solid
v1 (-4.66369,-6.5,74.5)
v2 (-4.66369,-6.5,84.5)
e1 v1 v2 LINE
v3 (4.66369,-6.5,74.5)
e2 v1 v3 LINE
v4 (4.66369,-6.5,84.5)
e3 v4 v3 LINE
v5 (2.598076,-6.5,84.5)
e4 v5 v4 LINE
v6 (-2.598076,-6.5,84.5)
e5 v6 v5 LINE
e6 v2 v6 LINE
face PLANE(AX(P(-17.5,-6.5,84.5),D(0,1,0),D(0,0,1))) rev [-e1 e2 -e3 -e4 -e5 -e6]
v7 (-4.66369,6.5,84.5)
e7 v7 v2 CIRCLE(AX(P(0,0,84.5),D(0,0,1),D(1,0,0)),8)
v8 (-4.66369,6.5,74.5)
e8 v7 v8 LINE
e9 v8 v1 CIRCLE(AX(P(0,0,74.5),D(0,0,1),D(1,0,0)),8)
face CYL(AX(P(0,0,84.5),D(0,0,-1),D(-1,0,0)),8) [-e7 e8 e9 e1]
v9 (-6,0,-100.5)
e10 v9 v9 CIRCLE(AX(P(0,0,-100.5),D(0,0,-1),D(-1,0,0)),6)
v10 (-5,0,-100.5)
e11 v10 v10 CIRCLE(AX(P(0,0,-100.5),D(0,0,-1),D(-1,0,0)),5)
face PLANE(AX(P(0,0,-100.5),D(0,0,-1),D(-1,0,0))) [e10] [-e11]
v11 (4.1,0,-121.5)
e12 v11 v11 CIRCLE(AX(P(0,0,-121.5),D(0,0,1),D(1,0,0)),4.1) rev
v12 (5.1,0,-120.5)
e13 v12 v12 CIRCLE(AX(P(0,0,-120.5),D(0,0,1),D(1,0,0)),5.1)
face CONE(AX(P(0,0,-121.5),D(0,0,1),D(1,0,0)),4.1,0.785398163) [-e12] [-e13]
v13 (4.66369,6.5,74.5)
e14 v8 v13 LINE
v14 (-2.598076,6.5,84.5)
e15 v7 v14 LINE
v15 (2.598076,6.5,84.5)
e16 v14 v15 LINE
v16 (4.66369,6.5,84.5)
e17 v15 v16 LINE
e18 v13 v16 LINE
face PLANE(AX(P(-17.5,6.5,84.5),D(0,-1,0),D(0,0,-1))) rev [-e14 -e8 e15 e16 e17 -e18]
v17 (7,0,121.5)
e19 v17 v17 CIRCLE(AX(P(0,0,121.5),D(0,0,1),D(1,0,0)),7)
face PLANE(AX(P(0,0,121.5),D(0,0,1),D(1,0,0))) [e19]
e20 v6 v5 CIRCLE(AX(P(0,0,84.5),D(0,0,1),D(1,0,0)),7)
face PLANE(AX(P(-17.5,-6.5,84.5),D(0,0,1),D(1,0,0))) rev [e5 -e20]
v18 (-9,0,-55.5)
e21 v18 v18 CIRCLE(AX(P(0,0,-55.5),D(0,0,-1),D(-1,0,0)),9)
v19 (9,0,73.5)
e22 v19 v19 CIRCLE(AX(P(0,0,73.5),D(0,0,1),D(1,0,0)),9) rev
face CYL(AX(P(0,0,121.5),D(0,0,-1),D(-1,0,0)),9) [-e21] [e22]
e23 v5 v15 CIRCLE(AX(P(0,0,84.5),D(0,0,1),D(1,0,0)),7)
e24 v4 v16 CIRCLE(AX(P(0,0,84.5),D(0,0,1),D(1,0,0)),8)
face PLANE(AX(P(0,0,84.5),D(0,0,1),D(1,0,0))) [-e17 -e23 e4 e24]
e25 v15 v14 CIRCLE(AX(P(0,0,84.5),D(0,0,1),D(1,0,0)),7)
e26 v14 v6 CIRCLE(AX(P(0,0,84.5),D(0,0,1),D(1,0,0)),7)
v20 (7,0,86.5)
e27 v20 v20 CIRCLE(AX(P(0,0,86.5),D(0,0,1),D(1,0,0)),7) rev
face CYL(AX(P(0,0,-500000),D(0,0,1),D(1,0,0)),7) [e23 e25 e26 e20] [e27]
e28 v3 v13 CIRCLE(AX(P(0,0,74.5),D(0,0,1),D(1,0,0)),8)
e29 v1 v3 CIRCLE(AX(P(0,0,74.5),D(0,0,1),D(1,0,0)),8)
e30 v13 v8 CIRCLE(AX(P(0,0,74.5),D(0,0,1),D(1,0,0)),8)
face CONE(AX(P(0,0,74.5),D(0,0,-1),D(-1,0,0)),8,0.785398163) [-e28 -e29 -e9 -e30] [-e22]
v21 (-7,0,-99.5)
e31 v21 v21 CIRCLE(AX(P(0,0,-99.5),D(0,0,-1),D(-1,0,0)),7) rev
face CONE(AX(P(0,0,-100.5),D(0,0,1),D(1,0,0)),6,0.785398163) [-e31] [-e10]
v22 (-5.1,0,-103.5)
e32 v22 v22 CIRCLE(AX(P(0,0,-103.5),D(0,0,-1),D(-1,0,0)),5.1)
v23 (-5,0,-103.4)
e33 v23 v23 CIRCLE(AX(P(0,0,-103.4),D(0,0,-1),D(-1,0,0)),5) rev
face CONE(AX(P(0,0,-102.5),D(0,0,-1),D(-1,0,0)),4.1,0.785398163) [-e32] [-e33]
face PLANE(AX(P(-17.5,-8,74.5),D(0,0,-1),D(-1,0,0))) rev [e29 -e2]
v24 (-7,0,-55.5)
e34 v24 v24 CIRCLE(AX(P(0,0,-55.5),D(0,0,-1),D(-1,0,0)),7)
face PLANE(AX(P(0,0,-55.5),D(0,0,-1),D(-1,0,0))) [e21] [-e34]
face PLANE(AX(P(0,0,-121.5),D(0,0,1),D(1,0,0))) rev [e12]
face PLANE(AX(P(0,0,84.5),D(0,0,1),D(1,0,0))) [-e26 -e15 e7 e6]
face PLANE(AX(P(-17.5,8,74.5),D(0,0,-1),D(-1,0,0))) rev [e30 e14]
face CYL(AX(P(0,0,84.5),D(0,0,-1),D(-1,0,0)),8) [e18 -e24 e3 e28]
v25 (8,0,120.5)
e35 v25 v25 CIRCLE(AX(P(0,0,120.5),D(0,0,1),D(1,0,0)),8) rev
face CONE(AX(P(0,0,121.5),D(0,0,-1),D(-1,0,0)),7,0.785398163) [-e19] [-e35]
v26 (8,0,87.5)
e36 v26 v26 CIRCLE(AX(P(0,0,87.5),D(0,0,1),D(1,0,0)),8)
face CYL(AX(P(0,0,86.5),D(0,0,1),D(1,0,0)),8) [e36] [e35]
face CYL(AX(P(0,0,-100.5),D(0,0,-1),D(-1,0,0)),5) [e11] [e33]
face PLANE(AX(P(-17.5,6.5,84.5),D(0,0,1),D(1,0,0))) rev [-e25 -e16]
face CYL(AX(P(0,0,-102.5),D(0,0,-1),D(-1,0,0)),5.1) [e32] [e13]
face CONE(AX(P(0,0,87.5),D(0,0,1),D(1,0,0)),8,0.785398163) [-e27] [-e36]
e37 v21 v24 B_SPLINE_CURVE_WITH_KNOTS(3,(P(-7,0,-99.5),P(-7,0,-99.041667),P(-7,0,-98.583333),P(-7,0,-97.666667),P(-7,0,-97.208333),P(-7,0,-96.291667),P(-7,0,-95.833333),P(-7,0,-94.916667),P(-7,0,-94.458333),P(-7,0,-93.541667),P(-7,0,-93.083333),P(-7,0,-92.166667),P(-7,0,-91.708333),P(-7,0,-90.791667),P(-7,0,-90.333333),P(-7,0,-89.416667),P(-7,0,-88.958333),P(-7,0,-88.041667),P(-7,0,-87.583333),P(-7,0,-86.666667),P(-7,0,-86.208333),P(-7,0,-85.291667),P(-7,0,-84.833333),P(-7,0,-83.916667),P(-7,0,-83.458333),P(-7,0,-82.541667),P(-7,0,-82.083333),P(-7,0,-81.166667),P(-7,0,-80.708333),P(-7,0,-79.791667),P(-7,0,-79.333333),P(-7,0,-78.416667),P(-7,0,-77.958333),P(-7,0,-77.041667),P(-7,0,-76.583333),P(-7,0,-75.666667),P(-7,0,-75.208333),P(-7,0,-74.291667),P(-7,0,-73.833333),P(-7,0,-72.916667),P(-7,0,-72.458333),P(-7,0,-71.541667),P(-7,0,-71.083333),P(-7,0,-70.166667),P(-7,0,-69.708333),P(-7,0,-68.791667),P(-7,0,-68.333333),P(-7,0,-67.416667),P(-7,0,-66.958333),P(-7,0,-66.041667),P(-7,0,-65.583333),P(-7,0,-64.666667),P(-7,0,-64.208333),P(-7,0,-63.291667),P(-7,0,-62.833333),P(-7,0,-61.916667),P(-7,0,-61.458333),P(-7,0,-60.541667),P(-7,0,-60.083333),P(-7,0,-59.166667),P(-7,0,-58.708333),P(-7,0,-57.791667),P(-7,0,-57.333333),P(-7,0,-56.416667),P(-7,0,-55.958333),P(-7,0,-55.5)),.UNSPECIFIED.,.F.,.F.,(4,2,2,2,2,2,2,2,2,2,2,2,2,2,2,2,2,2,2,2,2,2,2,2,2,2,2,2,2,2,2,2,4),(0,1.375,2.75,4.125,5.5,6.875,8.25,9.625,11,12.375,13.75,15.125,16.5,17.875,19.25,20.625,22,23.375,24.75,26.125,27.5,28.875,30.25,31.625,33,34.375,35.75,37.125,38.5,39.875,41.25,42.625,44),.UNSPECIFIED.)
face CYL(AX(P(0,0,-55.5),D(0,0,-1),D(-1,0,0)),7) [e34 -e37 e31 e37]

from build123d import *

# Parameters (mm, degrees)
SKETCH1_R           = 9
BOSS_EXTRUDE1_DEPTH = 121.5
SKETCH2_OUTSIDE_W   = 68.866
SKETCH2_OUTSIDE_H   = 68.866
SKETCH2_OUTSIDE_R   = 5.1
CUT_EXTRUDE2_DEPTH  = 19
SKETCH3_OUTSIDE_W   = 68.866
SKETCH3_OUTSIDE_H   = 68.866
SKETCH3_OUTSIDE_R   = 5
CUT_EXTRUDE3_DEPTH  = 2
SKETCH4_OUTSIDE_W   = 68.866
SKETCH4_OUTSIDE_H   = 68.866
SKETCH4_OUTSIDE_R   = 7
CUT_EXTRUDE4_DEPTH  = 45
CHAMFER1_SIZE       = 1
SKETCH5_OUTSIDE_W   = 68.866
SKETCH5_OUTSIDE_H   = 68.866
SKETCH5_OUTSIDE_R   = 6.5
CUT_EXTRUDE5_DEPTH  = 47
SKETCH6_R           = 8
BOSS_EXTRUDE2_DEPTH = 10
BOSS_EXTRUDE3_START = -35
SKETCH8_R           = 8
BOSS_EXTRUDE3_DEPTH = 35
CHAMFER3_SIZE       = 1
BOSS_EXTRUDE4_REACH = 210.389
SKETCH12_R          = 7
SKETCH14_W          = 10
SKETCH14_H          = 1.5
CUT_EXTRUDE7_DEPTH  = 17.5


# Some blends are built 0.0001 mm under size
with BuildPart() as part:
    # Sketch1 → Boss-Extrude1 (new, symmetric)
    with BuildSketch(Plane.XY):
        Circle(SKETCH1_R)
    extrude(amount=BOSS_EXTRUDE1_DEPTH, both=True)

    # Sketch2 outside → Cut-Extrude2 (cut)
    with BuildSketch(Plane(origin=(0, 0, -121.5), x_dir=(-1, 0, 0), z_dir=(0, 0, -1))):
        Rectangle(SKETCH2_OUTSIDE_W, SKETCH2_OUTSIDE_H)
        Circle(SKETCH2_OUTSIDE_R, mode=Mode.SUBTRACT)
    extrude(amount=-CUT_EXTRUDE2_DEPTH, mode=Mode.SUBTRACT)

    # Sketch3 outside → Cut-Extrude3 (cut)
    with BuildSketch(Plane(origin=(0, 0, -102.5), x_dir=(-1, 0, 0), z_dir=(0, 0, -1))):
        Rectangle(SKETCH3_OUTSIDE_W, SKETCH3_OUTSIDE_H)
        Circle(SKETCH3_OUTSIDE_R, mode=Mode.SUBTRACT)
    extrude(amount=-CUT_EXTRUDE3_DEPTH, mode=Mode.SUBTRACT)

    # Sketch4 outside → Cut-Extrude4 (cut)
    with BuildSketch(Plane(origin=(0, 0, -100.5), x_dir=(-1, 0, 0), z_dir=(0, 0, -1))):
        Rectangle(SKETCH4_OUTSIDE_W, SKETCH4_OUTSIDE_H)
        Circle(SKETCH4_OUTSIDE_R, mode=Mode.SUBTRACT)
    extrude(amount=-CUT_EXTRUDE4_DEPTH, mode=Mode.SUBTRACT)

    # Chamfer1
    # the kernel refuses this chamfer: 1 mm, written as the material it takes off along each edge
    with BuildSketch(Plane(origin=(0, 0, -100.5), x_dir=(-1, 0, 0), z_dir=(0, -1, 0))) as chamfer1_piece_1:
        Polygon((7, -CHAMFER1_SIZE), (7 - CHAMFER1_SIZE, 0), (7, 0), align=None)
    revolve(axis=Axis((0, 0, -100.5), (0, 0, -1)), mode=Mode.SUBTRACT)
    with BuildSketch(Plane(origin=(0, 0, -102.5), x_dir=(-1, 0, 0), z_dir=(0, -1, 0))) as chamfer1_piece_2_section:
        Polygon((5.1 - CHAMFER1_SIZE, 0), (5.1, CHAMFER1_SIZE), (5.1, 0), align=None)
    chamfer1_piece_2 = revolve(axis=Axis((0, 0, -102.5), (0, 0, -1)), mode=Mode.PRIVATE)
    chamfer1_piece_2 = chamfer1_piece_2 - Plane(origin=(0, 0, -103.453026439), x_dir=(-1, 0, 0), z_dir=(0, 0, -1)) * Cylinder(5, 21, mode=Mode.PRIVATE)
    add(chamfer1_piece_2, mode=Mode.SUBTRACT)
    with BuildSketch(Plane(origin=(0, 0, -121.5), x_dir=(-1, 0, 0), z_dir=(0, -1, 0))) as chamfer1_piece_3:
        Polygon((5.1, -CHAMFER1_SIZE), (5.1 - CHAMFER1_SIZE, 0), (5.1, 0), align=None)
    revolve(axis=Axis((0, 0, -121.5), (0, 0, -1)), mode=Mode.SUBTRACT)

    # Sketch5 outside → Cut-Extrude5 (cut)
    with BuildSketch(Plane.XY.offset(121.5)):
        Rectangle(SKETCH5_OUTSIDE_W, SKETCH5_OUTSIDE_H)
        Circle(SKETCH5_OUTSIDE_R, mode=Mode.SUBTRACT)
    extrude(amount=-CUT_EXTRUDE5_DEPTH, mode=Mode.SUBTRACT)

    # Sketch6 → Boss-Extrude2 (add)
    with BuildSketch(Plane.XY.offset(74.5)):
        Circle(SKETCH6_R)
    extrude(amount=BOSS_EXTRUDE2_DEPTH)

    # Sketch8 → Boss-Extrude3 (add)
    with BuildSketch(Plane.XY.offset(121.5).offset(BOSS_EXTRUDE3_START)):
        Circle(SKETCH8_R)
    extrude(amount=BOSS_EXTRUDE3_DEPTH)

    # Chamfer3
    chamfer3_edges = [part.edges().sort_by_distance(p)[0] for p in [
        (-9, 0, 74.5),
        (-8, 0, 86.5),
        (-8, 0, 121.5),
    ]]
    chamfer(chamfer3_edges, length=CHAMFER3_SIZE - 0.0001)  # a hair under: the kernel refuses the full size

    # Sketch12 → Boss-Extrude4 (add, up to next)
    with BuildSketch(Plane(origin=(0, 0, 86.5), x_dir=(-1, 0, 0), z_dir=(0, 0, -1)), mode=Mode.PRIVATE) as boss_extrude4_sk1:
        Circle(SKETCH12_R)
    boss_extrude4_tool1 = extrude(boss_extrude4_sk1.sketch, amount=BOSS_EXTRUDE4_REACH, mode=Mode.PRIVATE) - part.part
    add(boss_extrude4_tool1.solids().sort_by_distance((0, 0, 86.5))[0])

    # Sketch14 → Cut-Extrude7 (cut, symmetric)
    with BuildSketch(Plane(origin=(0, 0, 0), x_dir=(0, 0, -1), z_dir=(1, 0, 0))):
        with Locations((-79.5, 7.25)):
            Rectangle(SKETCH14_W, SKETCH14_H)
        with Locations((-79.5, -7.25)):
            Rectangle(SKETCH14_W, SKETCH14_H)
    extrude(amount=CUT_EXTRUDE7_DEPTH, both=True, mode=Mode.SUBTRACT)


solid = part.part
